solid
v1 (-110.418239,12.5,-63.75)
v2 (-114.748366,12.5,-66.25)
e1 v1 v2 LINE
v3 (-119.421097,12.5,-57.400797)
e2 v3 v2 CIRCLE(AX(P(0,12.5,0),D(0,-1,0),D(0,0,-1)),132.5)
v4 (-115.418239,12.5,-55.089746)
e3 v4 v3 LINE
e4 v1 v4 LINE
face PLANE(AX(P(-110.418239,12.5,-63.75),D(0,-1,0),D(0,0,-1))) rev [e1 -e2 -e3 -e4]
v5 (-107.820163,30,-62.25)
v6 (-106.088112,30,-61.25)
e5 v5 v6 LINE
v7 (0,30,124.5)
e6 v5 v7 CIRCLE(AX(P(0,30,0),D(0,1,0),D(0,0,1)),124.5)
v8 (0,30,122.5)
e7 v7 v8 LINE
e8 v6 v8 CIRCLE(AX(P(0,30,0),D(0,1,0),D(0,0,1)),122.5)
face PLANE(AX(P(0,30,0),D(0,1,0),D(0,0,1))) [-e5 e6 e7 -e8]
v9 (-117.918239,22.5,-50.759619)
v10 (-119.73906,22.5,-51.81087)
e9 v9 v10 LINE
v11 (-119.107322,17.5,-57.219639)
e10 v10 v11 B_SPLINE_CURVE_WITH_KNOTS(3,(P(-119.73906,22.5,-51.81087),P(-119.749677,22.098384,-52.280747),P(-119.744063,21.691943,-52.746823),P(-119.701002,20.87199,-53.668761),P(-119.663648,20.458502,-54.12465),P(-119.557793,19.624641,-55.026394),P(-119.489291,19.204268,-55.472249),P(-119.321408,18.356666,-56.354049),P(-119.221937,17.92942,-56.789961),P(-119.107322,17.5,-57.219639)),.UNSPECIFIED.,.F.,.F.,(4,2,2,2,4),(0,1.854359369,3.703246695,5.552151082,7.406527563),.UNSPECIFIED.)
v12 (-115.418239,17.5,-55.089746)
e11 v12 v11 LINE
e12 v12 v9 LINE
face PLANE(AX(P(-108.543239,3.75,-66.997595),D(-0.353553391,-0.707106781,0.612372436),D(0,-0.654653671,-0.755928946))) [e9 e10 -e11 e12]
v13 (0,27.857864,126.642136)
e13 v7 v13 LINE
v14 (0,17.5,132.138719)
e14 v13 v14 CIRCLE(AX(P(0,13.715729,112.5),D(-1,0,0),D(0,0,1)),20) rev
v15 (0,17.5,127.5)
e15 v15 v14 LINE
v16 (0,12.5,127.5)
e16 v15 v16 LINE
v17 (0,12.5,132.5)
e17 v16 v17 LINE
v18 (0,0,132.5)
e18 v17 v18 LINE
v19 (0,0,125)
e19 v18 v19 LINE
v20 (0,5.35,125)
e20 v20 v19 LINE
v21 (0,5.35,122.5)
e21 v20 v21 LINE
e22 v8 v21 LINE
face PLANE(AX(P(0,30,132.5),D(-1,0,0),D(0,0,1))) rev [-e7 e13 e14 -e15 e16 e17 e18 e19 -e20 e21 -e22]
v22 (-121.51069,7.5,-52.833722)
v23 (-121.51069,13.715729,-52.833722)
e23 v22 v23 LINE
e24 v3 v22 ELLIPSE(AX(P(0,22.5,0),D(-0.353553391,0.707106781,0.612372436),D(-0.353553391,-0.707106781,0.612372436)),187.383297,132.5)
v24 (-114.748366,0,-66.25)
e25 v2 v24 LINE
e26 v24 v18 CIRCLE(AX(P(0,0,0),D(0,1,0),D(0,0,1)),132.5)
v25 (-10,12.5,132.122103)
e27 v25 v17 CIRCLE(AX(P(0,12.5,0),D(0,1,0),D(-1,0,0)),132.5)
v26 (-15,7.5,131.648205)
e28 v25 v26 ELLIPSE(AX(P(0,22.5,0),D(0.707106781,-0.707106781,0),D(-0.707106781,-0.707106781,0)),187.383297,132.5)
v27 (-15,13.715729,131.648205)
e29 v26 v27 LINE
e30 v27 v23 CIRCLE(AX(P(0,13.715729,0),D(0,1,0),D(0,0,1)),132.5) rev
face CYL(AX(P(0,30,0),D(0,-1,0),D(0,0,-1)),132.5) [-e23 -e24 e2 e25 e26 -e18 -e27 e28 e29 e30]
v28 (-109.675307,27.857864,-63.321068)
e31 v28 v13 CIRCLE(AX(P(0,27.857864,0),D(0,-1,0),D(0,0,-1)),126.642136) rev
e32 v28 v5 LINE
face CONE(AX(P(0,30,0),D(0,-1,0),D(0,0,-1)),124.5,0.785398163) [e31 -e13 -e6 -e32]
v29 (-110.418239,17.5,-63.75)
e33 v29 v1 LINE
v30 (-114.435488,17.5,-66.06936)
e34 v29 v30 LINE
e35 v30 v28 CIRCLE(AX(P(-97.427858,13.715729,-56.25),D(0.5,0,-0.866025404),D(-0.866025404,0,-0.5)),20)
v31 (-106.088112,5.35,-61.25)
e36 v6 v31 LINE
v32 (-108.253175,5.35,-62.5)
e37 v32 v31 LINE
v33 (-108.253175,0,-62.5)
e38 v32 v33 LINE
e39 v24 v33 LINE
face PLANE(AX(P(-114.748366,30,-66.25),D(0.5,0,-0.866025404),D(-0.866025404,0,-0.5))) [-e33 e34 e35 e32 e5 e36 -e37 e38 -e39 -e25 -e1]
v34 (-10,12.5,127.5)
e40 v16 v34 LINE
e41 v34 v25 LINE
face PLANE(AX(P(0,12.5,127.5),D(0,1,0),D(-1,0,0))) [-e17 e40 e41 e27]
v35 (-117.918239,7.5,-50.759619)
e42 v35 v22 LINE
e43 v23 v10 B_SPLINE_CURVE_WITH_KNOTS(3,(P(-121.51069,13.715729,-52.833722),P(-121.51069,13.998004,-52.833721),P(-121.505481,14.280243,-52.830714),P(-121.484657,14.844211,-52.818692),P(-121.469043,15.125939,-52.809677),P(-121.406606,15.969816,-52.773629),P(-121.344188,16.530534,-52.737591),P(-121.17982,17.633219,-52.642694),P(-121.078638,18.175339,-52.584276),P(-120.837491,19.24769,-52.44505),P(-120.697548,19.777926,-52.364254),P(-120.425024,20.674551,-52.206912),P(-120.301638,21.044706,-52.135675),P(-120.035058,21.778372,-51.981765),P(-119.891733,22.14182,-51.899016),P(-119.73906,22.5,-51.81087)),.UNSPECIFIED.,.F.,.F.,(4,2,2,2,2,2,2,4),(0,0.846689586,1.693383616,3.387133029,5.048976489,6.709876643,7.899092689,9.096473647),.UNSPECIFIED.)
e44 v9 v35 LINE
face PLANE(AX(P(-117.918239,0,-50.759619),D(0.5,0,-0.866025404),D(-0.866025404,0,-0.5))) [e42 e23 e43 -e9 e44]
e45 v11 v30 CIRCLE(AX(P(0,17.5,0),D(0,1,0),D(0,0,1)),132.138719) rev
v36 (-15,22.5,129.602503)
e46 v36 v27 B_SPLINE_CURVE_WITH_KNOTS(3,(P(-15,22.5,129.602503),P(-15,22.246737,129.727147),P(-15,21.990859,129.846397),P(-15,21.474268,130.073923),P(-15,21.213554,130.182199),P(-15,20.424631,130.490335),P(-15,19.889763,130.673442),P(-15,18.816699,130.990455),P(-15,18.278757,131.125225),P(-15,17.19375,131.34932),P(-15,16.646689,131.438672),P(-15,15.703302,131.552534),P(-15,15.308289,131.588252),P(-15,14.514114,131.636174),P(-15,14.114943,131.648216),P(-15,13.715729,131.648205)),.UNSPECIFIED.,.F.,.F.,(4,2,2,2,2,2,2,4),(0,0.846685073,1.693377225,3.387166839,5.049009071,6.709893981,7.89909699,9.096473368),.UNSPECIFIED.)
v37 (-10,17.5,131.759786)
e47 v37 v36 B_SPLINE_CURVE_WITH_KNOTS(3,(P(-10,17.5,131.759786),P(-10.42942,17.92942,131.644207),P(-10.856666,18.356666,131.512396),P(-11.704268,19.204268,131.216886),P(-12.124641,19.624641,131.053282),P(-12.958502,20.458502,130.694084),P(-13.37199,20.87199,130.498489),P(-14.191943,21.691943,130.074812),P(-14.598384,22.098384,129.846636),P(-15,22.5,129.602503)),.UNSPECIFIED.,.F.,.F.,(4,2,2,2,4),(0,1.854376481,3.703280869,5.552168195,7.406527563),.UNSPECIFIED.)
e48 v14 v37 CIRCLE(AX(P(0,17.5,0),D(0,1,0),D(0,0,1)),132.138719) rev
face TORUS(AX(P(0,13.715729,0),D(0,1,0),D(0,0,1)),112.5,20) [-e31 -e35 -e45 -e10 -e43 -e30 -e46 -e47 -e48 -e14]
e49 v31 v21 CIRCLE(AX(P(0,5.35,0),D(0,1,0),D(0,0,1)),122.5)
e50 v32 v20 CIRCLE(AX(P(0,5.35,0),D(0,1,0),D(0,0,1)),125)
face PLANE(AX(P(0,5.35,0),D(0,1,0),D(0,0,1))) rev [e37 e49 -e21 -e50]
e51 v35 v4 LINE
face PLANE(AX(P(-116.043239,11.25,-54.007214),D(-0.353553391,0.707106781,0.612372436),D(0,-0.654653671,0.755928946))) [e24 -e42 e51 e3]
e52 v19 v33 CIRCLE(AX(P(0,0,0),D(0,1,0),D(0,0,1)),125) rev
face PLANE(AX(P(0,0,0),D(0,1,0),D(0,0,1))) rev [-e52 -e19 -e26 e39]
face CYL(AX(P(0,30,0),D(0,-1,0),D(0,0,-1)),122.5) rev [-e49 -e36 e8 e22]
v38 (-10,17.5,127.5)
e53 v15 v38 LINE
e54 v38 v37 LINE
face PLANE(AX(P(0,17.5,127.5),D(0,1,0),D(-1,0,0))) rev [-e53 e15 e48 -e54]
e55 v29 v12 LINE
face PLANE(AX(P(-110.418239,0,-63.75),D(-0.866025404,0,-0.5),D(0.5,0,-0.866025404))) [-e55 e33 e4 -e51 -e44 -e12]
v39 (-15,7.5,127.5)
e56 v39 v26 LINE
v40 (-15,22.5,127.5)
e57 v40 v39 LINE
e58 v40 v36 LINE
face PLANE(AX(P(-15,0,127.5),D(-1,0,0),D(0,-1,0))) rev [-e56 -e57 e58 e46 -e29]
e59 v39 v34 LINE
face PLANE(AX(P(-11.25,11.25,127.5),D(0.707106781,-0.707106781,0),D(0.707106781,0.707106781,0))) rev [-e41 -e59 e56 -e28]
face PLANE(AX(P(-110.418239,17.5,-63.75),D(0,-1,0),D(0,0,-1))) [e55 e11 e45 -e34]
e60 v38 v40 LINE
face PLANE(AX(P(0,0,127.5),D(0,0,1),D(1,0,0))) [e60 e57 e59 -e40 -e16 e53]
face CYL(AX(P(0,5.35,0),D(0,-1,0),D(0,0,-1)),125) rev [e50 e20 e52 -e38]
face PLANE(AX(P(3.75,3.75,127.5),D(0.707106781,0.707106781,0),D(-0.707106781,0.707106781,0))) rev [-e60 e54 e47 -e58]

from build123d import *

# Parameters (mm, degrees)
BOSS_EXTRUDE1_DEPTH = 30
SKETCH2_R           = 125
CUT_EXTRUDE1_DEPTH  = 5.35
SKETCH3_W           = 10
SKETCH3_H           = 5
CUT_EXTRUDE2_DEPTH  = 5
CHAMFER2_SIZE       = 8
FILLET1_R           = 20


with BuildPart() as part:
    # Sketch1 → Boss-Extrude1 (new body)
    with BuildSketch(Plane(origin=(0, 0, 0), x_dir=(1, 0, 0), z_dir=(0, 1, 0))):
        with BuildLine():
            Line((-114.748366001, 66.25), (-106.088111964, 61.25))
            ThreePointArc((-106.088111964, 61.25), (-106.088111964, -61.25), (0, -122.5))
            Line((0, -122.5), (0, -132.5))
            ThreePointArc((0, -132.5), (-114.748366001, -66.25), (-114.748366001, 66.25))
        make_face()
    extrude(amount=BOSS_EXTRUDE1_DEPTH)

    # Sketch2 → Cut-Extrude1 (cut)
    with BuildSketch(Plane(origin=(0, 0, 0), x_dir=(1, 0, 0), z_dir=(0, 1, 0))):
        Circle(SKETCH2_R)
    extrude(amount=CUT_EXTRUDE1_DEPTH, mode=Mode.SUBTRACT)

    # Sketch3 → Cut-Extrude2 (cut)
    with BuildSketch(Plane.XY.offset(132.5)):
        with Locations((-5, 15)):
            Rectangle(SKETCH3_W, SKETCH3_H)
        Polygon((-15, 22.5), (-15, 7.5), (-10, 12.5), (-10, 17.5), align=None)
    cut_extrude2 = extrude(amount=-CUT_EXTRUDE2_DEPTH, mode=Mode.SUBTRACT)

    # Mirror1: Cut-Extrude2 across plane
    add(cut_extrude2.mirror(Plane(origin=(0, 0, 0), x_dir=(-0.8660254037844389, 0, 0.4999999999999995), z_dir=(0.4999999999999996, 0, 0.8660254037844389))), mode=Mode.SUBTRACT)

    # Chamfer2
    # the kernel refuses this chamfer: 8 mm, written as the material it takes off along each edge
    with BuildSketch(Plane(origin=(0, 30, 0), x_dir=(0.1547578410621492, 0, 0.9879524333842102), z_dir=(0.9879524333842102, 0, -0.1547578410621492))) as chamfer2_piece_1:
        Polygon((132.5 - CHAMFER2_SIZE, 0), (132.5, CHAMFER2_SIZE), (132.5, 0), align=None)
    revolve(axis=Axis((0, 30, 0), (0, -1, 0)), revolution_arc=137.805504207, mode=Mode.SUBTRACT)

    # Fillet1
    # the kernel refuses this fillet: 20 mm, written as the material it takes off along each edge
    with BuildSketch(Plane(origin=(0, 22, 0), x_dir=(0.04293180283805991, 0, 0.9990780051152532), z_dir=(0.9990780051152532, 0, -0.04293180283805991))) as fillet1_piece_1:
        with BuildLine():
            CenterArc((132.5 - FILLET1_R, FILLET1_R * 0.414213562373), FILLET1_R, 315, 45)
            Line((132.5, FILLET1_R * 0.414213562373), (132.5, 0))
            Line((132.5, 0), (132.5 - FILLET1_R * 0.292893218813, -FILLET1_R * 0.292893218813))
        make_face()
    revolve(axis=Axis((0, 22, 0), (0, -1, 0)), revolution_arc=124.921134732, mode=Mode.SUBTRACT)


solid = part.part
